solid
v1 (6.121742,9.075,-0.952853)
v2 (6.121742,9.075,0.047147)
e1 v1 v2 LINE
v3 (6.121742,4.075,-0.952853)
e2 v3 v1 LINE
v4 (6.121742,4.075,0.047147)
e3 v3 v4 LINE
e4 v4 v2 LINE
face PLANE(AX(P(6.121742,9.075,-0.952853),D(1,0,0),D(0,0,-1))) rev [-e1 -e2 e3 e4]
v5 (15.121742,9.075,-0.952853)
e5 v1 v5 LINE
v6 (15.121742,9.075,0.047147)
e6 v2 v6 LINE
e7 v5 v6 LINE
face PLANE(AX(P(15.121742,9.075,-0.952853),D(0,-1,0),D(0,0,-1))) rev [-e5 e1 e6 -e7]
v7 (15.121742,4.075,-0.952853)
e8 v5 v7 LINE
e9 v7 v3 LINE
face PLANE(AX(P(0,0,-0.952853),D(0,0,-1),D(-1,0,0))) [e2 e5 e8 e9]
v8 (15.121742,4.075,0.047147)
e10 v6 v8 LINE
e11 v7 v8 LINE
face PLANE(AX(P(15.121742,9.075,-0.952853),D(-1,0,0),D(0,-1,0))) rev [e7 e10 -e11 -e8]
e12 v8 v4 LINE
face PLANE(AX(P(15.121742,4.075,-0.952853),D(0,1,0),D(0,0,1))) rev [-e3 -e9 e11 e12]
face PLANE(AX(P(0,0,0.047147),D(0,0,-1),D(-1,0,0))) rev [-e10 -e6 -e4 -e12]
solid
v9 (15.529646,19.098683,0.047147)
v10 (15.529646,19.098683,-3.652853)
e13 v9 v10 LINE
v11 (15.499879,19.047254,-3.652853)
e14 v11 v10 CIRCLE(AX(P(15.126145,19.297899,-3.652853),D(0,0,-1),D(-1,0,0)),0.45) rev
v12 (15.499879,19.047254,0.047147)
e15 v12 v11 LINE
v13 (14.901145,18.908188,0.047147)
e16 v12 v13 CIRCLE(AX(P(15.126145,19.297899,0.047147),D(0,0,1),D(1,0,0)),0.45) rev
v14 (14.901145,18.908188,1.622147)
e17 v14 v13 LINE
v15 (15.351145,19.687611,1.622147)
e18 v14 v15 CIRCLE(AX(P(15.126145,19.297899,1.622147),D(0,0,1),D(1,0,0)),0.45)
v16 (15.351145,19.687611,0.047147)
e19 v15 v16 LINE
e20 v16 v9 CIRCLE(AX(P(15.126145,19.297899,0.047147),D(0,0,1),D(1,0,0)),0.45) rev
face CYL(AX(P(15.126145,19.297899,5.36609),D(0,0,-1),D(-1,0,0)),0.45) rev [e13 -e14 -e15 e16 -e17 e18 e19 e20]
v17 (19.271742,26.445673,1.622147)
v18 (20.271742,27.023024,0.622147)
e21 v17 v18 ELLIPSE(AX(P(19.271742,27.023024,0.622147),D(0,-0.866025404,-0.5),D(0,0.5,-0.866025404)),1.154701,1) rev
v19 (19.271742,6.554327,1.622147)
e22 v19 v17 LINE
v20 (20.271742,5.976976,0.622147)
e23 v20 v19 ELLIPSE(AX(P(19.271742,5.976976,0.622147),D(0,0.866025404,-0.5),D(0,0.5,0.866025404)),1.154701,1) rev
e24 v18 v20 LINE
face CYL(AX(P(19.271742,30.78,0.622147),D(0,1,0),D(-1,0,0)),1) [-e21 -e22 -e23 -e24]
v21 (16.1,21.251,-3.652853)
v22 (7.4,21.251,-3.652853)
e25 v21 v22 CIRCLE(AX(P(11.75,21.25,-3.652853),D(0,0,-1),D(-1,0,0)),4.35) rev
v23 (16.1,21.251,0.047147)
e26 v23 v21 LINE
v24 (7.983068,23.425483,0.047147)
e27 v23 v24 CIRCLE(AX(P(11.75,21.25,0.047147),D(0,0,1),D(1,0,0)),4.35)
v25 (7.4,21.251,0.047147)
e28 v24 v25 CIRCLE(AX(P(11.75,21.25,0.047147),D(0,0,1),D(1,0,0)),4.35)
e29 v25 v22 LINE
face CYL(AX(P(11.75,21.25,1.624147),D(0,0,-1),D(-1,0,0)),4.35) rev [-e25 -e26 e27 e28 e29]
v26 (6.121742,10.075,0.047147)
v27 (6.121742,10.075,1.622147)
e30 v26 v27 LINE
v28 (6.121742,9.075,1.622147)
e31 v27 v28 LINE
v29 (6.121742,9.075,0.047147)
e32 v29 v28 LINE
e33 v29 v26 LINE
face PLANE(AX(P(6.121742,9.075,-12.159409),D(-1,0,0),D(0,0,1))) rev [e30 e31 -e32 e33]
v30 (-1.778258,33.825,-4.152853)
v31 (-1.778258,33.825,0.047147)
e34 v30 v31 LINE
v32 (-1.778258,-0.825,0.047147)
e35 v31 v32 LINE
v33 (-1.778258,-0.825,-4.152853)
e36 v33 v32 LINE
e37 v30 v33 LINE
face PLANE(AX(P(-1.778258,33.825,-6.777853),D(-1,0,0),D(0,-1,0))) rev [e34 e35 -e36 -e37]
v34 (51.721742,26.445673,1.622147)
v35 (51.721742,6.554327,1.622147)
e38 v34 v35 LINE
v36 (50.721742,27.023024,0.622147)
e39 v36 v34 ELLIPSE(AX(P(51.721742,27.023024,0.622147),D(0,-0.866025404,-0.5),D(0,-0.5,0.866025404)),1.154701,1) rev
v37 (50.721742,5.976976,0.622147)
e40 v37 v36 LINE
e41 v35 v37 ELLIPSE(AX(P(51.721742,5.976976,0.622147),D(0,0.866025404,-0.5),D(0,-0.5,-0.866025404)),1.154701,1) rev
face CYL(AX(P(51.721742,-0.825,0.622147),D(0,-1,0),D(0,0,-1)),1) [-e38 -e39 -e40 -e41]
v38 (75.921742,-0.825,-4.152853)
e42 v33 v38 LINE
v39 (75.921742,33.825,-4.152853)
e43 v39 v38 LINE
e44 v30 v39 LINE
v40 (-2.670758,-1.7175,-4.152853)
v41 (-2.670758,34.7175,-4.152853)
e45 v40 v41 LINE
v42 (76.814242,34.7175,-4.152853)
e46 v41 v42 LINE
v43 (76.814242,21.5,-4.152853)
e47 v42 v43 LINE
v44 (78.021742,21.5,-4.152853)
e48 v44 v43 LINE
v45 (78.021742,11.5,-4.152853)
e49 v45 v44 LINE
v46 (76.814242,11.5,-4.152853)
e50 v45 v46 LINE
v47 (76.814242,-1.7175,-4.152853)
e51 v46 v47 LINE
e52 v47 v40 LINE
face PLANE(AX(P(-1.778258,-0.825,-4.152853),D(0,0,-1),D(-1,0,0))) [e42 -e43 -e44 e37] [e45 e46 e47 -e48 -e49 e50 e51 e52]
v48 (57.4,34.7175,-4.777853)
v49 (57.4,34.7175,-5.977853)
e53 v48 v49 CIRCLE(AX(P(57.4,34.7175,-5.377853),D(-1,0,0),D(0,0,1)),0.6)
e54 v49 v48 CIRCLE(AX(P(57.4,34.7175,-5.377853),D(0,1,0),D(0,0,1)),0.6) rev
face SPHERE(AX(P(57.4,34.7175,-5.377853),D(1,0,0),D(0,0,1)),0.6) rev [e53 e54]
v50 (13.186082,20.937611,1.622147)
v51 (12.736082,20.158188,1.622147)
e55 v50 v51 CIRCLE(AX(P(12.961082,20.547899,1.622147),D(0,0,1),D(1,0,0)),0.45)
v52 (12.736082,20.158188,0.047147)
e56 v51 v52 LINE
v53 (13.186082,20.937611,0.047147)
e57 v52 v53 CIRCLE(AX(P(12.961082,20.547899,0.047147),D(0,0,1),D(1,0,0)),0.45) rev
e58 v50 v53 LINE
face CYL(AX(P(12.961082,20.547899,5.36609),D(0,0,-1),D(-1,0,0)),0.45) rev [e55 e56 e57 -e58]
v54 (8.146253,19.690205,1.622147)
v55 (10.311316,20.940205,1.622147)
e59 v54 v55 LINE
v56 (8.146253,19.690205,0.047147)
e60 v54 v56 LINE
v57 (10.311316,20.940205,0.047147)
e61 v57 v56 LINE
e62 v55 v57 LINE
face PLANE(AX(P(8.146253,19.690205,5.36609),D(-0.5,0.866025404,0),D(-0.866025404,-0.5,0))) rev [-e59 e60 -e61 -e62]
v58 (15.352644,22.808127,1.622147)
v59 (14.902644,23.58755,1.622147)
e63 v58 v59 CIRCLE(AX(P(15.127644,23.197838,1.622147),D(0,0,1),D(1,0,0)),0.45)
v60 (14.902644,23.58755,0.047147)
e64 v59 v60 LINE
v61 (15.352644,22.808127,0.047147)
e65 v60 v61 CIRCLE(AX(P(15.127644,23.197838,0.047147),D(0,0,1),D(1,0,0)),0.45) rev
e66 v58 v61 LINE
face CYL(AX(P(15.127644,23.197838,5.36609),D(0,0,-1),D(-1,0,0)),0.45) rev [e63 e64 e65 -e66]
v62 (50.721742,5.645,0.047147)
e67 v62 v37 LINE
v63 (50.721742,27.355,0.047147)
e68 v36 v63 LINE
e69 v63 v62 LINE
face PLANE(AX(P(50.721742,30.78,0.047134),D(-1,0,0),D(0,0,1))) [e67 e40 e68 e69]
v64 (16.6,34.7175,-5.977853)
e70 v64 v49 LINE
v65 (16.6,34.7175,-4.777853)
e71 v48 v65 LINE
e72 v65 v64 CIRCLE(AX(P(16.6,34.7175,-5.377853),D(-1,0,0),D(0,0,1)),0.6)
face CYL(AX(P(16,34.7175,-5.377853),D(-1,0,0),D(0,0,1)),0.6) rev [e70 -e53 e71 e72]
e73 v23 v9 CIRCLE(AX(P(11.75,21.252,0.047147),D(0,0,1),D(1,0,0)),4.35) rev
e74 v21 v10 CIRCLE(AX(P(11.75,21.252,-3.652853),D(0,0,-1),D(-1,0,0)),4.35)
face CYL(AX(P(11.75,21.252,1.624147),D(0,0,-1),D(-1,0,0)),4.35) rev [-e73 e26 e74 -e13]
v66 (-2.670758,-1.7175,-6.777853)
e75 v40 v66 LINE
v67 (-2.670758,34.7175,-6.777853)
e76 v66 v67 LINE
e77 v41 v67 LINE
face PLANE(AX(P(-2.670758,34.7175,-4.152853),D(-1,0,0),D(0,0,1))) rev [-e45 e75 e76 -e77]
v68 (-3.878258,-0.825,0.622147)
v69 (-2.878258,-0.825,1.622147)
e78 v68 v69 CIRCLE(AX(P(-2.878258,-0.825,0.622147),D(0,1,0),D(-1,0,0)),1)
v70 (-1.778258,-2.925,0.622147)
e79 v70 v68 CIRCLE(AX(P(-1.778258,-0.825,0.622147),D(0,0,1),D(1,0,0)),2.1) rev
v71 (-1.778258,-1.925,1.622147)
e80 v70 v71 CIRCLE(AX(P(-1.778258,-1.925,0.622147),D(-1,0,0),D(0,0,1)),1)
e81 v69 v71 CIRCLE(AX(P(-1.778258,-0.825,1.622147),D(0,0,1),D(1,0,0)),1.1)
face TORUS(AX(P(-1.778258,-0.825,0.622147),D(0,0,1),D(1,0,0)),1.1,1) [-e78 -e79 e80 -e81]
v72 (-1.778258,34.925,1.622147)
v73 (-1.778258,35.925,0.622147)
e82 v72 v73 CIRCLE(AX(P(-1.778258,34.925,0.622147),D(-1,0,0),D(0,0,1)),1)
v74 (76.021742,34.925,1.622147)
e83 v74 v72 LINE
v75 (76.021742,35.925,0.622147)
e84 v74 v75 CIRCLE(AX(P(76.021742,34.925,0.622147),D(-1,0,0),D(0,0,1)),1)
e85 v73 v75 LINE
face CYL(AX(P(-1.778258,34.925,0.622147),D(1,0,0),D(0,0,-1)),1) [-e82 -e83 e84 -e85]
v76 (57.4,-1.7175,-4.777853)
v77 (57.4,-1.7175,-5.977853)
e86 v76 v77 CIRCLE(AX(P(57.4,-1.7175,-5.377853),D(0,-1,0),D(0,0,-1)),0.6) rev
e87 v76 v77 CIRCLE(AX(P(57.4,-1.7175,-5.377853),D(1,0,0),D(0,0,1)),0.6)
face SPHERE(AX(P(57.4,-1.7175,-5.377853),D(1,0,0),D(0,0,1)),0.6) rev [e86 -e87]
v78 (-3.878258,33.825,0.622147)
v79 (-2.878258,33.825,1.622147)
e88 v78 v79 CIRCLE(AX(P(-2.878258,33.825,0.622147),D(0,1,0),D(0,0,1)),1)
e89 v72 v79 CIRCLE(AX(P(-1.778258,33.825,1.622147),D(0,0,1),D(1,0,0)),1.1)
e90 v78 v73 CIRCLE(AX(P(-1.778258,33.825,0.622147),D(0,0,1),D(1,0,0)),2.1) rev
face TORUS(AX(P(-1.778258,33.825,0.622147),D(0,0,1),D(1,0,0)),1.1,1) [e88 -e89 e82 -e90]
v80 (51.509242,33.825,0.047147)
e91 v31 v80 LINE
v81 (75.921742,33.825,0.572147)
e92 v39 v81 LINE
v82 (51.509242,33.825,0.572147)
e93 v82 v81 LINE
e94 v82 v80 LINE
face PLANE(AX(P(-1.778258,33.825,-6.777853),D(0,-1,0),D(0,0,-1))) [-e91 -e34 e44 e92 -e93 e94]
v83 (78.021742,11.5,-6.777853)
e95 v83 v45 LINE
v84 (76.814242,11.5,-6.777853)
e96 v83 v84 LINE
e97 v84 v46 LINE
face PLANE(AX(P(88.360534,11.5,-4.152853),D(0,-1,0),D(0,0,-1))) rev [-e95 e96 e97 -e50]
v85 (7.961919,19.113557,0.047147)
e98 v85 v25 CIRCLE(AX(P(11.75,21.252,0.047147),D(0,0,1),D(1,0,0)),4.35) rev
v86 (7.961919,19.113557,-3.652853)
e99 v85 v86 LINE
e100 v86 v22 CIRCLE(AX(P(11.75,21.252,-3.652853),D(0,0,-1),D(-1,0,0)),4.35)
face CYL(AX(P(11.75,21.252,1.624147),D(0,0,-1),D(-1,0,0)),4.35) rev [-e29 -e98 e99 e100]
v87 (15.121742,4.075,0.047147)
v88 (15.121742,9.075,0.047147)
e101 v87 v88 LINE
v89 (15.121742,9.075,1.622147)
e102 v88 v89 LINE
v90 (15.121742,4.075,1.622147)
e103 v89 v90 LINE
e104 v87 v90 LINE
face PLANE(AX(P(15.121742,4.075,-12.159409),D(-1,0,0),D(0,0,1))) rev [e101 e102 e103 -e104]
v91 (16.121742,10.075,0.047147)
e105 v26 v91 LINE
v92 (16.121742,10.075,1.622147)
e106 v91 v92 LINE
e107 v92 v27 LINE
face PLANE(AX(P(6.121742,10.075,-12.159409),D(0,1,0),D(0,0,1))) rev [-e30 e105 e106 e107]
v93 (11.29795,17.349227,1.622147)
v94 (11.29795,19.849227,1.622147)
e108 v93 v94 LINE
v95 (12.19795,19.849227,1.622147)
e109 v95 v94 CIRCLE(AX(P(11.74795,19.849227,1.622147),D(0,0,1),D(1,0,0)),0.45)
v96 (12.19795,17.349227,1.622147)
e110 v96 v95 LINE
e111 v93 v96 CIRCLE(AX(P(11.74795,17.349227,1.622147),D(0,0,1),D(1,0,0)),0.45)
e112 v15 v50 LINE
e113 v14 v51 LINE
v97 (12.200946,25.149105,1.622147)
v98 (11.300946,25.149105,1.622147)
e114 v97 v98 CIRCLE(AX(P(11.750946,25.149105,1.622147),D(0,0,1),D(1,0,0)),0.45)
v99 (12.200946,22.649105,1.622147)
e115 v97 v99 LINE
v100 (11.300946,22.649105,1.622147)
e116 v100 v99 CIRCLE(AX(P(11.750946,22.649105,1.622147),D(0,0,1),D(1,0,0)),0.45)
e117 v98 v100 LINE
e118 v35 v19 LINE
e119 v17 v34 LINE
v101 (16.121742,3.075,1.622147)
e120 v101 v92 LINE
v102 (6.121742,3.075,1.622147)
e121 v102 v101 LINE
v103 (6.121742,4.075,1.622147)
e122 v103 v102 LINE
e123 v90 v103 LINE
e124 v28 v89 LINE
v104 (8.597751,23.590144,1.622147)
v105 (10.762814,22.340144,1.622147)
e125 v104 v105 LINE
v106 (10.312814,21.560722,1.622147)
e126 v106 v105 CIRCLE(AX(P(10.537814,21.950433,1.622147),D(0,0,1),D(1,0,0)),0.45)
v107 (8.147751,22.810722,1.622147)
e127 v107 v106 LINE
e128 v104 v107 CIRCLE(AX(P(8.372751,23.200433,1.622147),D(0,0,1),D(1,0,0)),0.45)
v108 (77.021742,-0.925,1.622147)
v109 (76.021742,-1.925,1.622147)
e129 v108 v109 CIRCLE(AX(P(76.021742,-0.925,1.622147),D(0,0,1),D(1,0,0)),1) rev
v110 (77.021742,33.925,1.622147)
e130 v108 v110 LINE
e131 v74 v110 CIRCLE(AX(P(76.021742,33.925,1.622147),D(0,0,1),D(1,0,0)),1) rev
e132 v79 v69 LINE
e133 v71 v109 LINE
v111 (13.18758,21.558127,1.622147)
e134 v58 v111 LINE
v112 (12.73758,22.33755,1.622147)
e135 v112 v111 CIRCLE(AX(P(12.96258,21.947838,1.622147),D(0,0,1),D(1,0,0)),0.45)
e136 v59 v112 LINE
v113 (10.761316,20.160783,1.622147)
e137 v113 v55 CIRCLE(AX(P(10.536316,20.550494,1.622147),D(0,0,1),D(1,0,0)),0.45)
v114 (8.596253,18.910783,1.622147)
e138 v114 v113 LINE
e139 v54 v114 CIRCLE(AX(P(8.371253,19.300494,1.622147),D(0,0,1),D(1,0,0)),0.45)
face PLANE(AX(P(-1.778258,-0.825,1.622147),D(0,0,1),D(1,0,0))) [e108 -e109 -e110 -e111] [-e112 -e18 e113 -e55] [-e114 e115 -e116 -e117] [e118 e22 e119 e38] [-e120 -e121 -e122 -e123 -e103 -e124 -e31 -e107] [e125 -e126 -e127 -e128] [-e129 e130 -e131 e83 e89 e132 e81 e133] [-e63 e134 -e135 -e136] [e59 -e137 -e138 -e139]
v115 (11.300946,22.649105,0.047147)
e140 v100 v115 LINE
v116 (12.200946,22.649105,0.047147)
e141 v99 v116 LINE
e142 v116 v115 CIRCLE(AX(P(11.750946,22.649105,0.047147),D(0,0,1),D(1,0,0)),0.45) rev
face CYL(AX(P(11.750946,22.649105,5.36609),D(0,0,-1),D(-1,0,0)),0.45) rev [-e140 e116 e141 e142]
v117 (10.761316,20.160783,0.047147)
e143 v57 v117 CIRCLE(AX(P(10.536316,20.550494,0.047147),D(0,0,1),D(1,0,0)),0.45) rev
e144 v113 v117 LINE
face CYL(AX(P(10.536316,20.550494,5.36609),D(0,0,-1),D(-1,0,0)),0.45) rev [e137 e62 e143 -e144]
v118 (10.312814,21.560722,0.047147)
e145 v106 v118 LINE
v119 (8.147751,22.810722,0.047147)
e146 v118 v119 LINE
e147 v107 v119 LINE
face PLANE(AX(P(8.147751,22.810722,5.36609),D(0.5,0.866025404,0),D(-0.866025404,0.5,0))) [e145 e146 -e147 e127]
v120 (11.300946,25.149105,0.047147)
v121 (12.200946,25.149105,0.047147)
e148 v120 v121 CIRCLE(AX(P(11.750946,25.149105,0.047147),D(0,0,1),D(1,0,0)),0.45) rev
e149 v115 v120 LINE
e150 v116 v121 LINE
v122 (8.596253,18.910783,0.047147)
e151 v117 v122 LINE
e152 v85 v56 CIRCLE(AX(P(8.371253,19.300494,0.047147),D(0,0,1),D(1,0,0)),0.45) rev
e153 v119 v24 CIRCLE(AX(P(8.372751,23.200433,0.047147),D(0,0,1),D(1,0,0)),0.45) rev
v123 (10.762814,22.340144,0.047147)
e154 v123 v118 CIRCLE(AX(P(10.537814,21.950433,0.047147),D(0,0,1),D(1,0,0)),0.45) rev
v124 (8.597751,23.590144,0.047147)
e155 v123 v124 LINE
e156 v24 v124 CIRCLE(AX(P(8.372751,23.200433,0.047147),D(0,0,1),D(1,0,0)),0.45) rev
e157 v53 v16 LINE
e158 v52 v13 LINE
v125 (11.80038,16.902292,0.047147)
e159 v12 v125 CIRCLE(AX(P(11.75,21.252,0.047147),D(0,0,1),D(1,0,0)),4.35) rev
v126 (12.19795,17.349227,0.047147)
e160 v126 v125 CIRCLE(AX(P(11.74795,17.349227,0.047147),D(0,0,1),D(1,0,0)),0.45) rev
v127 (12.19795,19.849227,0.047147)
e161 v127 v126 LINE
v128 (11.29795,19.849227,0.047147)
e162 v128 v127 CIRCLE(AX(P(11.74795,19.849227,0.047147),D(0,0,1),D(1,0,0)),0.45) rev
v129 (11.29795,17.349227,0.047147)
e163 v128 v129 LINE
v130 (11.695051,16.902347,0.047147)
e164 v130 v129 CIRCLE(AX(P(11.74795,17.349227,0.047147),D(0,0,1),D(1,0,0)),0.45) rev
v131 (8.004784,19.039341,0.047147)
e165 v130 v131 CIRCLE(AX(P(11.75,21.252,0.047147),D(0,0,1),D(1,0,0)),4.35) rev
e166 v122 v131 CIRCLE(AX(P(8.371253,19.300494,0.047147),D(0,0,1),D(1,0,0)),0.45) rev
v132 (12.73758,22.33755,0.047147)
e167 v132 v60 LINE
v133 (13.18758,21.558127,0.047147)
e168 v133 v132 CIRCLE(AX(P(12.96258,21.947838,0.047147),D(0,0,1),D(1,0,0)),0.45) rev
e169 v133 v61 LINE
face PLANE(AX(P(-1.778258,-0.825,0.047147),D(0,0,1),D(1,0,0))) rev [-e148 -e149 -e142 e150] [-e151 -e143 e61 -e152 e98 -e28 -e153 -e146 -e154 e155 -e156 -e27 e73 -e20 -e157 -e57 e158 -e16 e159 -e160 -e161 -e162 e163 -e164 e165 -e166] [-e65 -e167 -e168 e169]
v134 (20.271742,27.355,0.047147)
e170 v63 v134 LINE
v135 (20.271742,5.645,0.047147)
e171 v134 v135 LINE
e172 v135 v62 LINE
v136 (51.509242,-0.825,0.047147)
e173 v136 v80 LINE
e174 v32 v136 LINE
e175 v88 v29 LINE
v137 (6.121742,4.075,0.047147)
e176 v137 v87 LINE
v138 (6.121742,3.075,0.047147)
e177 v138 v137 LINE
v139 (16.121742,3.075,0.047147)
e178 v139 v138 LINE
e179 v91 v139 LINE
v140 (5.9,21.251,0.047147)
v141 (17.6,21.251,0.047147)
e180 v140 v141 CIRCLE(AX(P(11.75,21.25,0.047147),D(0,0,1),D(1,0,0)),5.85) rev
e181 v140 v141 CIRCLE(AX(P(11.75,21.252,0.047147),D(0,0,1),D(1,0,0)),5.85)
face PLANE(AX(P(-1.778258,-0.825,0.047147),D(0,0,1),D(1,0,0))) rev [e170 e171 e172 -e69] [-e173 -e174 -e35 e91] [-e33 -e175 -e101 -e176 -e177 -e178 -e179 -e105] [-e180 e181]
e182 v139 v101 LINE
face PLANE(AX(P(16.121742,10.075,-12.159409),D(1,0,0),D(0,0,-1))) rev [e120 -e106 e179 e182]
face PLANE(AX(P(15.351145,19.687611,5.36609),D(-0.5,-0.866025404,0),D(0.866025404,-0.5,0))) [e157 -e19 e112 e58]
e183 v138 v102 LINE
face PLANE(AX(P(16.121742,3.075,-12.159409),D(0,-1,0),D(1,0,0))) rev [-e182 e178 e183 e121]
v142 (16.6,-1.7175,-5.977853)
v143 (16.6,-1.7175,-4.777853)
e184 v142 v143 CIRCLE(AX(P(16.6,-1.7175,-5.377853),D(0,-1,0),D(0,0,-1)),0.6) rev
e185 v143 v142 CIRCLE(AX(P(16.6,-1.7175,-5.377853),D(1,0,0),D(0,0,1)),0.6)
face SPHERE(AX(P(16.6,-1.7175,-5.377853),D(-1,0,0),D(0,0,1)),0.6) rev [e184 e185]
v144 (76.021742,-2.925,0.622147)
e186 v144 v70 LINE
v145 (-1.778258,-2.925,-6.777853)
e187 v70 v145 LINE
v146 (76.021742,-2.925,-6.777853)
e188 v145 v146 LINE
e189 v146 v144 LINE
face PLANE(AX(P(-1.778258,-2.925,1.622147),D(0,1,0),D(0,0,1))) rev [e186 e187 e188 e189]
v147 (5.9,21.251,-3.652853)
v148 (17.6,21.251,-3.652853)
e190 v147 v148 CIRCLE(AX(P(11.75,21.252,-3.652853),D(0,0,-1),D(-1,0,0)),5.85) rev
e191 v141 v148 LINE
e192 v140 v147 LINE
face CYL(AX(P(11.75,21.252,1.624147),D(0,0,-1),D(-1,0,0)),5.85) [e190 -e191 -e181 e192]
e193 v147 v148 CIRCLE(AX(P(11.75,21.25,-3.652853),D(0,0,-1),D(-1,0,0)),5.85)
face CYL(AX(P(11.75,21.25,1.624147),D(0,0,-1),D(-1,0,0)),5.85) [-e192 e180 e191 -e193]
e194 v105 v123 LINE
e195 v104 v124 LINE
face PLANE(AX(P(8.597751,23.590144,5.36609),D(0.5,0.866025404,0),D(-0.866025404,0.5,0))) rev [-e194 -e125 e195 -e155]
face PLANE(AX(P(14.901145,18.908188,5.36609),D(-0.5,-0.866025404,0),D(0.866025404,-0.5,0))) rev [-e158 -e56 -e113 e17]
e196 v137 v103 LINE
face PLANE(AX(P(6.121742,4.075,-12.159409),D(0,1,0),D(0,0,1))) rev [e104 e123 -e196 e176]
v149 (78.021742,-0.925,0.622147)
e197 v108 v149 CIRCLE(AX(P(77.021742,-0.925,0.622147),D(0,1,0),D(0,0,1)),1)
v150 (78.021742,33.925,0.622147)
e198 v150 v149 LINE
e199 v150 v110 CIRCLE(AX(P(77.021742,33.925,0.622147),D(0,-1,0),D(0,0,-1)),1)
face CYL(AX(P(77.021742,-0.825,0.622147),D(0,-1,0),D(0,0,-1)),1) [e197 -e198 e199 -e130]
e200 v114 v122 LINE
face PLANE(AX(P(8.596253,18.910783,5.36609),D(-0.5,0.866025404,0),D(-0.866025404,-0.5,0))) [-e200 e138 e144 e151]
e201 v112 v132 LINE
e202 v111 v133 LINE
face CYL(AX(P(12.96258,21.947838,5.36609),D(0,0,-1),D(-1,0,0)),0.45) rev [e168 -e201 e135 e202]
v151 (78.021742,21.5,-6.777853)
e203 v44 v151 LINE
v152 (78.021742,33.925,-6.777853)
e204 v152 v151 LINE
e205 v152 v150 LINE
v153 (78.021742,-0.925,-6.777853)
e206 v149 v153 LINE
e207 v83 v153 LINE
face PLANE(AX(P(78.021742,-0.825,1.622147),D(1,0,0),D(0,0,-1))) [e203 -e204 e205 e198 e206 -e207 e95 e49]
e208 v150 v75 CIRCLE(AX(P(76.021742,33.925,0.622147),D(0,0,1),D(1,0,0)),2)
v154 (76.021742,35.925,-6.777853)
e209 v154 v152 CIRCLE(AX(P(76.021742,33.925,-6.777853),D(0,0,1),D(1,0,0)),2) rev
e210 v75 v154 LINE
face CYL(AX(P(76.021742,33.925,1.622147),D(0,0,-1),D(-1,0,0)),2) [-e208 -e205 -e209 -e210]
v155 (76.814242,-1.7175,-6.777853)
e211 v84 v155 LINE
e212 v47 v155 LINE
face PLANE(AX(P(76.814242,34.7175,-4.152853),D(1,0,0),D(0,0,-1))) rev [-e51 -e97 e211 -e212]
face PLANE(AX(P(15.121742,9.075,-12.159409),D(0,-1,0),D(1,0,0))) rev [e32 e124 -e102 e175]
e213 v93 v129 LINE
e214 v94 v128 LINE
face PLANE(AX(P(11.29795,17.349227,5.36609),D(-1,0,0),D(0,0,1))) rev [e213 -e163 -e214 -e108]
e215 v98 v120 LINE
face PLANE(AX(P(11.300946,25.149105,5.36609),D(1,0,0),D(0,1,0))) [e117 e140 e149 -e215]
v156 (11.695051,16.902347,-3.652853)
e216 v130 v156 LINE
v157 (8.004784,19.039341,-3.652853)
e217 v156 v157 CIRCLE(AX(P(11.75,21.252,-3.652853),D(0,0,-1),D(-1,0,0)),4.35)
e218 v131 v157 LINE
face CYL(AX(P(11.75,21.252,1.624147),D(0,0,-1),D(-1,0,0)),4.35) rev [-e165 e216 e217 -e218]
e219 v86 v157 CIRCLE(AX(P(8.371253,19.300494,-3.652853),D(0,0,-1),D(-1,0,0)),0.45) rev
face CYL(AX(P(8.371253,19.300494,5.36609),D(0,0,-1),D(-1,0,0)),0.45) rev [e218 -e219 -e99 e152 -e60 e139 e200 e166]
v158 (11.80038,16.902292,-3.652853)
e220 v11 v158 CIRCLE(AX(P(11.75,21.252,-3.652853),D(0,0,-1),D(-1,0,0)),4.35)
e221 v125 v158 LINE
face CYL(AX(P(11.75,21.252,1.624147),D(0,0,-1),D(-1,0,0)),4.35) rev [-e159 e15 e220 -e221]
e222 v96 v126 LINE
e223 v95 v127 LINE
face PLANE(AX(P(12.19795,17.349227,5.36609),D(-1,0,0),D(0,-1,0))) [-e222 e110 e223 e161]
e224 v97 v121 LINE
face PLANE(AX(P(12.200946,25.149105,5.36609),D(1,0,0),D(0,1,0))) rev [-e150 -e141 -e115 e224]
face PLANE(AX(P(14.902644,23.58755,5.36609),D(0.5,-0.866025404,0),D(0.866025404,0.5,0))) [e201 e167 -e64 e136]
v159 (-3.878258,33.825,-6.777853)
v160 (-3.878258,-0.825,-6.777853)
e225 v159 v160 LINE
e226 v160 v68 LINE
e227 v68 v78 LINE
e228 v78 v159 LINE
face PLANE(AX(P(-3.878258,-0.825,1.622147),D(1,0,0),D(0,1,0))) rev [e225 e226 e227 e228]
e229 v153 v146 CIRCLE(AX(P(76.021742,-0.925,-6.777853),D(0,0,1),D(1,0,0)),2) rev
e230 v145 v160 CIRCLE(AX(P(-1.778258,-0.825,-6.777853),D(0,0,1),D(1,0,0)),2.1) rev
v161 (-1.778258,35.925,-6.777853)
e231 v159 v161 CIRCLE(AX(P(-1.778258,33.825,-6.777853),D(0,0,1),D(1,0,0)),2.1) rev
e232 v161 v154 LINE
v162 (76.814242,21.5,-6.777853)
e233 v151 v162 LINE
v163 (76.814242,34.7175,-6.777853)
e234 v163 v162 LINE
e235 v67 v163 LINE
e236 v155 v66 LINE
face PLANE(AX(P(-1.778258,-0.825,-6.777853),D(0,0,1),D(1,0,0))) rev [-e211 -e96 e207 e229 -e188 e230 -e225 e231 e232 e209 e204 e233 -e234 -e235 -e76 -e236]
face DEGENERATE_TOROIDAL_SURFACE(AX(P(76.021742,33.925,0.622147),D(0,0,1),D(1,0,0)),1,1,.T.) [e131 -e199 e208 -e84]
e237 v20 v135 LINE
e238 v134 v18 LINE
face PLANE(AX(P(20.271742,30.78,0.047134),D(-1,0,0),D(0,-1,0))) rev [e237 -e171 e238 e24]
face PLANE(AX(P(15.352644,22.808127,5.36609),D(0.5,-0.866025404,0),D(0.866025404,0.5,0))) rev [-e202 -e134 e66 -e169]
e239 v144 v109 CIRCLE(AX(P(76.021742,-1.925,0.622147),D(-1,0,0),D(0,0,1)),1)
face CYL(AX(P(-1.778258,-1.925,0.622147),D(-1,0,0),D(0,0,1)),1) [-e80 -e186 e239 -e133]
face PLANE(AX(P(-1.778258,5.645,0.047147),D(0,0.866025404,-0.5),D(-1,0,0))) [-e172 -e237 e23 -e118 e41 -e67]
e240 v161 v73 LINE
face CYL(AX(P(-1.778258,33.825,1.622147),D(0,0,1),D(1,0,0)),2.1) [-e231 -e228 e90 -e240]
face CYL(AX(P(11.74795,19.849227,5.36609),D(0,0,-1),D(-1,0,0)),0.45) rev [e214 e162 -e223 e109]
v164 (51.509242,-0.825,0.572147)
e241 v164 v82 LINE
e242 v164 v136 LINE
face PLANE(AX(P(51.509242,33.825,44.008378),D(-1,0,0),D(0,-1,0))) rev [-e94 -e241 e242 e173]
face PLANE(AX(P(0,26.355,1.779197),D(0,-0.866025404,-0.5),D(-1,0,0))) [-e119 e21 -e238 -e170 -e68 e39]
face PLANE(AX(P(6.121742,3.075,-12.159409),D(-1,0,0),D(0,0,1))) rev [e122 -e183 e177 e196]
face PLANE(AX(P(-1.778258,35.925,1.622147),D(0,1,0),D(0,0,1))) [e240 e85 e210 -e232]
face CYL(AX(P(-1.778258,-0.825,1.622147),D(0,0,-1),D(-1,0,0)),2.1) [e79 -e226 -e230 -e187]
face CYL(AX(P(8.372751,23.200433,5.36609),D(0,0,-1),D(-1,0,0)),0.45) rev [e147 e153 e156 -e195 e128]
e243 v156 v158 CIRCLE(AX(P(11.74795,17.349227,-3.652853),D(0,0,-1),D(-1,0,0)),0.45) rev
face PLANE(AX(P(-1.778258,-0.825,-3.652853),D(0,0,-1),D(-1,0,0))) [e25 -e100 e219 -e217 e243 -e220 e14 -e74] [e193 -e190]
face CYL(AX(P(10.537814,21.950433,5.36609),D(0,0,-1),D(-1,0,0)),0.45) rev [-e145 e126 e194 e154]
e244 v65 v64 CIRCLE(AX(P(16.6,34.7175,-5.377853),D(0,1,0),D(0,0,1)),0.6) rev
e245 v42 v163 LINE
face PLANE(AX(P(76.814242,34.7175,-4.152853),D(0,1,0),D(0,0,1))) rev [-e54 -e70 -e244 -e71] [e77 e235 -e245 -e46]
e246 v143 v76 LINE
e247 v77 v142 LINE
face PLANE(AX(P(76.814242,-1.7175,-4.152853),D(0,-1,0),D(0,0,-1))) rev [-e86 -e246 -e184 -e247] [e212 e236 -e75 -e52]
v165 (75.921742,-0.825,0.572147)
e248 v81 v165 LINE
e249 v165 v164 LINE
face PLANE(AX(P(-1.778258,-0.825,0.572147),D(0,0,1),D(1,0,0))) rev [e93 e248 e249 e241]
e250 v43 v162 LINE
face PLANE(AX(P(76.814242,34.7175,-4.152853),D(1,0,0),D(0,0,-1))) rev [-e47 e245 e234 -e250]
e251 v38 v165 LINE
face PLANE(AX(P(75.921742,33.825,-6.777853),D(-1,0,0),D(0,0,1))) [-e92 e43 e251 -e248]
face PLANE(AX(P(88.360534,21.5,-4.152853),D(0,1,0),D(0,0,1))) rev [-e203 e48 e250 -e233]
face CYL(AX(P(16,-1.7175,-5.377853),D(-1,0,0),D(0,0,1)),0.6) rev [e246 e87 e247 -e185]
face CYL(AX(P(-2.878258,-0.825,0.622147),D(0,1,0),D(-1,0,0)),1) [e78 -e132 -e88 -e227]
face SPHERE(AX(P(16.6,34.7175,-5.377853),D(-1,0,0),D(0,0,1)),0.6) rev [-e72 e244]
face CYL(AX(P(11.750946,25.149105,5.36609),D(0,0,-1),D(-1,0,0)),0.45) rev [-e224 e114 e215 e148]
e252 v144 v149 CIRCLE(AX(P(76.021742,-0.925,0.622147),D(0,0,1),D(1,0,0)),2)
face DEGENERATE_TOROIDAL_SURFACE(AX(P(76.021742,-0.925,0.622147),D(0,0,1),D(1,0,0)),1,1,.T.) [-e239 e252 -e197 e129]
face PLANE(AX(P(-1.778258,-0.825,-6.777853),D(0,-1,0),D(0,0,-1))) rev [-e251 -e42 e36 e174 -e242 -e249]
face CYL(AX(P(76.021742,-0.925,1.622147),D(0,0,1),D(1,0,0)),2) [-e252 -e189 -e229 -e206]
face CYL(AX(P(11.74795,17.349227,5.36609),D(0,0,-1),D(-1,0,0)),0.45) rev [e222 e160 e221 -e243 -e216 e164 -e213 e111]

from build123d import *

# Parameters (mm, degrees)
SKIZZE1_W                            = 74
SKIZZE1_H                            = 33
AUFSATZ_LINEAR_AUSTRAGEN5_DEPTH      = 1.5
SCHNITT_LINEAR_AUSTRAGEN1_DEPTH      = 82.038571063
SCHNITT_LINEAR_AUSTRAGEN1_DEPTH_BACK = 82.038571063
SKIZZE1_10_W                         = 29
SKIZZE1_10_H                         = 27.2
SKIZZE1_23_W                         = 78
SKIZZE1_23_H                         = 37
SKIZZE1_23_W_2                       = 74
SKIZZE1_23_H_2                       = 33
AUFSATZ_LINEAR_AUSTRAGEN7_DEPTH      = 6.5
SKIZZE1_24_W                         = 78
SKIZZE1_24_H                         = 37
SKIZZE1_24_W_2                       = 74
SKIZZE1_24_H_2                       = 33
AUFSATZ_LINEAR_AUSTRAGEN8_DEPTH      = 1.5
SKIZZE13_W                           = 23.25
SKIZZE13_H                           = 33
SCHNITT_LINEAR_AUSTRAGEN10_DEPTH     = 0.5
SKIZZE14_W                           = 29
SKIZZE14_H                           = 1.5
SCHNITT_LINEAR_AUSTRAGEN11_DEPTH     = 8
SKIZZE16_W                           = 75.7
SKIZZE16_H                           = 34.7
SCHNITT_LINEAR_AUSTRAGEN12_DEPTH     = 2.5
VERRUNDUNG7_R                        = 2
SKALIEREN1_SCALE                     = 1.05
VERRUNDUNG10_R                       = 1
SKIZZE21_W                           = 30.947992815
SKIZZE21_H                           = 1.575
AUFSATZ_LINEAR_AUSTRAGEN14_DEPTH     = 6
FASE1_SIZE                           = 1
FASE1_SIZE_2                         = 1.732050808
FASE1_OF_SPIEGELN2_SIZE              = 1.732050808
FASE1_OF_SPIEGELN2_SIZE_2            = 1
VERRUNDUNG11_R                       = 1
VERRUNDUNG12_R                       = 2
SCHNITT_LINEAR_AUSTRAGEN13_REACH     = 90.588
SKIZZE23_W                           = 2.625
SKIZZE23_H                           = 10
SCHNITT_LINEAR_AUSTRAGEN14_DEPTH     = 1.575
SKIZZE29_W                           = 9
SKIZZE29_H                           = 5
AUFSATZ_LINEAR_AUSTRAGEN16_DEPTH     = 1
SCHNITT_LINEAR_AUSTRAGEN16_DEPTH     = 1.622146556
AUFSATZ_LINEAR_START                 = -3.652853
AUFSATZ_LINEAR_AUSTRAGEN17_DEPTH     = 3.7


with BuildPart() as part:
    # Skizze1 → Aufsatz-Linear austragen5 (new body)
    with BuildSketch(Plane.XY):
        with Locations((37, 16.5)):
            Rectangle(SKIZZE1_W, SKIZZE1_H)
    extrude(amount=AUFSATZ_LINEAR_AUSTRAGEN5_DEPTH)

    # Skizze1<10> → Schnitt-Linear austragen1 (cut, two sides: drawn at the far end of the back side and taken through both)
    with BuildSketch(Plane.XY.offset(-SCHNITT_LINEAR_AUSTRAGEN1_DEPTH_BACK)):
        with Locations((35.5, 16.5)):
            Rectangle(SKIZZE1_10_W, SKIZZE1_10_H)
    extrude(amount=SCHNITT_LINEAR_AUSTRAGEN1_DEPTH + SCHNITT_LINEAR_AUSTRAGEN1_DEPTH_BACK, mode=Mode.SUBTRACT)



with BuildPart() as body_2:
    # Skizze1<23> → Aufsatz-Linear austragen7 (new body)
    with BuildSketch(Plane.XY):
        with Locations((37, 16.5)):
            Rectangle(SKIZZE1_23_W, SKIZZE1_23_H)
        with Locations((37, 16.5)):
            Rectangle(SKIZZE1_23_W_2, SKIZZE1_23_H_2, mode=Mode.SUBTRACT)
    extrude(amount=-AUFSATZ_LINEAR_AUSTRAGEN7_DEPTH)


with BuildPart() as part_1:
    add(part.part)

    add(body_2.part)  # Aufsatz-Linear austragen8 merges body 2
    # Skizze1<24> → Aufsatz-Linear austragen8 (add)
    with BuildSketch(Plane.XY):
        with Locations((37, 16.5)):
            Rectangle(SKIZZE1_24_W, SKIZZE1_24_H)
        with Locations((37, 16.5)):
            Rectangle(SKIZZE1_24_W_2, SKIZZE1_24_H_2, mode=Mode.SUBTRACT)
    extrude(amount=AUFSATZ_LINEAR_AUSTRAGEN8_DEPTH)

    # Skizze13 → Schnitt-Linear austragen10 (cut)
    with BuildSketch(Plane(origin=(0, 0, 0), x_dir=(-1, 0, 0), z_dir=(0, 0, -1))):
        with Locations((-62.375, 16.5)):
            Rectangle(SKIZZE13_W, SKIZZE13_H)
    extrude(amount=-SCHNITT_LINEAR_AUSTRAGEN10_DEPTH, mode=Mode.SUBTRACT)

    # Skizze14 → Schnitt-Linear austragen11 (cut)
    with BuildSketch(Plane(origin=(0, 0, 0), x_dir=(-1, 0, 0), z_dir=(0, 0, -1))):
        with Locations((-35.5, 30.85)):
            Rectangle(SKIZZE14_W, SKIZZE14_H)
        with Locations((-35.5, 2.15)):
            Rectangle(SKIZZE14_W, SKIZZE14_H)
    extrude(amount=-SCHNITT_LINEAR_AUSTRAGEN11_DEPTH, mode=Mode.SUBTRACT)

    # Skizze16 → Schnitt-Linear austragen12 (cut)
    with BuildSketch(Plane(origin=(0, 0, -6.5), x_dir=(-1, 0, 0), z_dir=(0, 0, -1))):
        with Locations((-37, 16.5)):
            Rectangle(SKIZZE16_W, SKIZZE16_H)
    extrude(amount=-SCHNITT_LINEAR_AUSTRAGEN12_DEPTH, mode=Mode.SUBTRACT)

    # Verrundung7
    verrundung7_edges = [part_1.edges().sort_by_distance(p)[0] for p in [
        (-2, 35, -2.5),
        (-2, -2, -2.5),
    ]]
    fillet(verrundung7_edges, radius=VERRUNDUNG7_R)


with BuildPart() as part_2:
    # Skalieren1: scaled about (35.565157989, 16.5, -0.942931129)
    add(part_1.part.scale(SKALIEREN1_SCALE).moved(Location((-1.778257899, -0.825, 0.047146556))))

    # Verrundung10
    verrundung10_edges = [part_2.edges().sort_by_distance(p)[0] for p in [
        (-3.878257899, 16.5, 1.622146556),
        (38.121742101, 35.925, 1.622146556),
        (38.121742101, -2.925, 1.622146556),
        (-3.26318214, -2.30992424, 1.622146556),
        (-3.26318214, 35.30992424, 1.622146556),
        (78.021742101, 16.5, 1.622146556),
    ]]
    fillet(verrundung10_edges, radius=VERRUNDUNG10_R)

    # Skizze21 → Aufsatz-Linear austragen14 (add)
    with BuildSketch(Plane.XZ.offset(-32.355)):
        with Locations((35.745738508, 0.834646556)):
            Rectangle(SKIZZE21_W, SKIZZE21_H)
    aufsatz_linear_austragen14 = extrude(amount=AUFSATZ_LINEAR_AUSTRAGEN14_DEPTH)

    # Fase1
    # the kernel refuses this chamfer: 1.732050808, 1 mm, written as the material it takes off along each edge
    with BuildSketch(Plane(origin=(50.721742101, 26.355, 0.047146556), x_dir=(0, 0.998322743753016, -0.05789386241606277), z_dir=(-1, 0, 0))) as fase1_piece_1:
        Polygon((FASE1_SIZE * 0.998322743754, -FASE1_SIZE * 0.0578938624023), (-FASE1_SIZE_2 * 0.0578938624017, -FASE1_SIZE_2 * 0.998322743505), (0, 0), align=None)
    extrude(amount=30.45, mode=Mode.SUBTRACT)

    # Spiegeln2: Aufsatz-Linear austragen14 across plane
    add(aufsatz_linear_austragen14.mirror(Plane.ZX.offset(16.5)))

    # Fase1 of Spiegeln2
    # the kernel refuses this chamfer: 1.732050808, 1 mm, written as the material it takes off along each edge
    with BuildSketch(Plane(origin=(50.721742101, 6.645, 0.047146556), x_dir=(0, 0.019326765612583986, 0.9998132206222101), z_dir=(-1, 0, 0))) as fase1_of_spiegeln2_piece_1:
        Polygon((FASE1_OF_SPIEGELN2_SIZE * 0.999813220373, -FASE1_OF_SPIEGELN2_SIZE * 0.0193267656078), (-FASE1_OF_SPIEGELN2_SIZE_2 * 0.0193267656264, -FASE1_OF_SPIEGELN2_SIZE_2 * 0.999813220622), (0, 0), align=None)
    extrude(amount=30.45, mode=Mode.SUBTRACT)

    # Verrundung11
    verrundung11_edges = [part_2.edges().sort_by_distance(p)[0] for p in [
        (50.721742101, 16.5, 1.622146556),
        (20.271742101, 16.5, 1.622146556),
    ]]
    fillet(verrundung11_edges, radius=VERRUNDUNG11_R)

    # Verrundung12
    # the kernel refuses this fillet: 2 mm, written as the material it takes off along each edge
    with BuildSketch(Plane(origin=(76.021742101, -0.925, 1.622146556), x_dir=(0, -1, 0), z_dir=(-1, 0, 0))) as verrundung12_piece_1:
        with BuildLine():
            CenterArc((1, -1), 1, 0, 90)
            Line((2, -1), (2, 0))
            Line((2, 0), (1, 0))
        make_face()
    revolve(axis=Axis((76.021742101, -0.925, 1.622146556), (0, 0, 1)), revolution_arc=90, mode=Mode.SUBTRACT)
    with BuildSketch(Plane(origin=(76.021742101, 33.925, 1.622146556), x_dir=(1, 0, 0), z_dir=(0, -1, 0))) as verrundung12_piece_2:
        with BuildLine():
            CenterArc((1, -1), 1, 0, 90)
            Line((2, -1), (2, 0))
            Line((2, 0), (1, 0))
        make_face()
    revolve(axis=Axis((76.021742101, 33.925, 1.622146556), (0, 0, 1)), revolution_arc=90, mode=Mode.SUBTRACT)
    with BuildSketch(Plane(origin=(78.021742101, -2.925, 1.622146556), x_dir=(0, 1, 0), z_dir=(0, 0, -1))) as verrundung12_piece_3:
        with BuildLine():
            CenterArc((VERRUNDUNG12_R, -VERRUNDUNG12_R), VERRUNDUNG12_R, 90, 90)
            Line((0, -VERRUNDUNG12_R), (0, 0))
            Line((0, 0), (VERRUNDUNG12_R, 0))
        make_face()
    extrude(amount=13.4, mode=Mode.SUBTRACT)
    with BuildSketch(Plane(origin=(78.021742101, 35.925, 1.622146556), x_dir=(0, -1, 0), z_dir=(0, 0, -1))) as verrundung12_piece_4:
        with BuildLine():
            CenterArc((VERRUNDUNG12_R, VERRUNDUNG12_R), VERRUNDUNG12_R, 180, 90)
            Line((0, VERRUNDUNG12_R), (0, 0))
            Line((0, 0), (VERRUNDUNG12_R, 0))
        make_face()
    extrude(amount=13.4, mode=Mode.SUBTRACT)

    # Skizze23 → Schnitt-Linear austragen13 (cut, up to next)
    with BuildSketch(Plane.ZY.offset(-76.814242101), mode=Mode.PRIVATE) as schnitt_linear_austragen13_sk1:
        with Locations((-5.465353444, 16.5)):
            Rectangle(SKIZZE23_W, SKIZZE23_H)
    schnitt_linear_austragen13_tool1 = extrude(schnitt_linear_austragen13_sk1.sketch, amount=-SCHNITT_LINEAR_AUSTRAGEN13_REACH, mode=Mode.PRIVATE) & part_2.part
    add(schnitt_linear_austragen13_tool1.solids().sort_by_distance((76.814242, 16.5, -5.465353))[0], mode=Mode.SUBTRACT)

    # Skizze26 → Schnitt-Rotation1 (revolve, cut)
    with BuildSketch(Plane.XZ.offset(-34.7175)):
        with BuildLine():
            Line((16, -5.377853444), (37, -5.377853444))
            Line((37, -5.377853444), (37, -4.777853444))
            Line((37, -4.777853444), (16.6, -4.777853444))
            ThreePointArc((16.6, -4.777853444), (16.175735931, -4.953589375), (16, -5.377853444))
        make_face()
    schnitt_rotation1 = revolve(axis=Axis((16, 34.7175, -5.377853444), (1, 0, 0)), mode=Mode.SUBTRACT)

    # Spiegeln3: Schnitt-Rotation1 across plane
    add(schnitt_rotation1.mirror(Plane.ZY.offset(-37)), mode=Mode.SUBTRACT)

    # Spiegeln4: Schnitt-Rotation1 across plane
    add(schnitt_rotation1.mirror(Plane.ZX.offset(16.5)), mode=Mode.SUBTRACT)

    # Spiegeln4 copy 1 sketch → Spiegeln4 copy 1 (revolve, cut)
    with BuildSketch(Plane(origin=(74, -1.7175, 0), x_dir=(-1, 0, 0), z_dir=(0, 1, 0))):
        with BuildLine():
            Line((16, -5.377853444), (37, -5.377853444))
            Line((37, -5.377853444), (37, -4.777853444))
            Line((37, -4.777853444), (16.6, -4.777853444))
            ThreePointArc((16.6, -4.777853444), (16.175735931, -4.953589375), (16, -5.377853444))
        make_face()
    revolve(axis=Axis((58, -1.7175, -5.377853444), (-1, 0, 0)), mode=Mode.SUBTRACT)

    # Skizze27 → Schnitt-Linear austragen14 (cut)
    with BuildSketch(Plane.XY.offset(1.622146556)):
        Polygon((6.121742101, 10.075), (16.121742101, 10.075), (16.121742101, 3.075), (6.121742101, 3.075), (6.121742101, 4.075), (15.121742101, 4.075), (15.121742101, 9.075), (6.121742101, 9.075), align=None)
    extrude(amount=-SCHNITT_LINEAR_AUSTRAGEN14_DEPTH, mode=Mode.SUBTRACT)

    # Skizze1<36> → Schnitt-Linear austragen16 (cut)
    with BuildSketch(Plane.XY):
        with BuildLine():
            Line((8.597750966, 23.590144421), (10.762814476, 22.340144421))
            ThreePointArc((10.762814476, 22.340144421), (10.927525907, 21.725432989), (10.312814476, 21.560721557))
            Line((10.312814476, 21.560721557), (8.147750966, 22.810721557))
            ThreePointArc((8.147750966, 22.810721557), (7.983039534, 23.425432989), (8.597750966, 23.590144421))
        make_face()
        with BuildLine():
            Line((11.300946332, 25.149105086), (11.300946332, 22.649105086))
            ThreePointArc((11.300946332, 22.649105086), (11.750946332, 22.199105086), (12.200946332, 22.649105086))
            Line((12.200946332, 22.649105086), (12.200946332, 25.149105086))
            ThreePointArc((12.200946332, 25.149105086), (11.750946332, 25.599105086), (11.300946332, 25.149105086))
        make_face()
        with BuildLine():
            Line((14.902643555, 23.587549559), (12.737580045, 22.337549559))
            ThreePointArc((12.737580045, 22.337549559), (12.572868614, 21.722838128), (13.187580045, 21.558126696))
            Line((13.187580045, 21.558126696), (15.352643555, 22.808126696))
            ThreePointArc((15.352643555, 22.808126696), (15.517354987, 23.422838128), (14.902643555, 23.587549559))
        make_face()
        with BuildLine():
            Line((15.351145411, 19.687610505), (13.186081901, 20.937610505))
            ThreePointArc((13.186081901, 20.937610505), (12.57137047, 20.772899073), (12.736081901, 20.158187641))
            Line((12.736081901, 20.158187641), (14.901145411, 18.908187641))
            ThreePointArc((14.901145411, 18.908187641), (15.515856843, 19.072899073), (15.351145411, 19.687610505))
        make_face()
        with BuildLine():
            Line((12.197950045, 17.349226977), (12.197950045, 19.849226977))
            ThreePointArc((12.197950045, 19.849226977), (11.747950045, 20.299226977), (11.297950045, 19.849226977))
            Line((11.297950045, 19.849226977), (11.297950045, 17.349226977))
            ThreePointArc((11.297950045, 17.349226977), (11.747950045, 16.899226977), (12.197950045, 17.349226977))
        make_face()
        with BuildLine():
            Line((8.596252822, 18.910782503), (10.761316332, 20.160782503))
            ThreePointArc((10.761316332, 20.160782503), (10.926027763, 20.775493935), (10.311316332, 20.940205366))
            Line((10.311316332, 20.940205366), (8.146252822, 19.690205366))
            ThreePointArc((8.146252822, 19.690205366), (7.98154139, 19.075493935), (8.596252822, 18.910782503))
        make_face()
    extrude(amount=SCHNITT_LINEAR_AUSTRAGEN16_DEPTH, mode=Mode.SUBTRACT)

    # Skizze1<38> → Aufsatz-Linear austragen17 (add)
    with BuildSketch(Plane.XY.offset(AUFSATZ_LINEAR_START)):
        with BuildLine():
            ThreePointArc((17.6, 21.251), (11.75, 27.100000085), (5.9, 21.251))
            ThreePointArc((5.9, 21.251), (11.75, 15.401999915), (17.6, 21.251))
        make_face()
        with BuildLine():
            ThreePointArc((16.099999885, 21.251), (15.954866713, 20.137730767), (15.529646414, 19.09868326))
            ThreePointArc((15.529646414, 19.09868326), (15.515612726, 19.07247678), (15.499879375, 19.047254058))
            ThreePointArc((15.499879375, 19.047254058), (13.931904838, 17.48878445), (11.800380036, 16.902291751))
            ThreePointArc((11.800380036, 16.902291751), (11.747713679, 16.899227039), (11.695050571, 16.902347076))
            ThreePointArc((11.695050571, 16.902347076), (9.57009197, 17.487627412), (8.004784464, 19.039340833))
            ThreePointArc((8.004784464, 19.039340833), (7.981580622, 19.075425996), (7.961918578, 19.113556841))
            ThreePointArc((7.961918578, 19.113556841), (7.542951432, 20.145997131), (7.400000115, 21.251))
            ThreePointArc((7.400000115, 21.251), (11.75, 25.6), (16.099999885, 21.251))
        make_face(mode=Mode.SUBTRACT)
    extrude(amount=AUFSATZ_LINEAR_AUSTRAGEN17_DEPTH)


with BuildPart() as body_2_2:
    # Skizze29 → Aufsatz-Linear austragen16 (new body)
    with BuildSketch(Plane(origin=(0, 0, 0.047146556), x_dir=(-1, 0, 0), z_dir=(0, 0, -1))):
        with Locations((-10.621742101, 6.575)):
            Rectangle(SKIZZE29_W, SKIZZE29_H)
    extrude(amount=AUFSATZ_LINEAR_AUSTRAGEN16_DEPTH)


solid = Compound([part_2.part, body_2_2.part])
